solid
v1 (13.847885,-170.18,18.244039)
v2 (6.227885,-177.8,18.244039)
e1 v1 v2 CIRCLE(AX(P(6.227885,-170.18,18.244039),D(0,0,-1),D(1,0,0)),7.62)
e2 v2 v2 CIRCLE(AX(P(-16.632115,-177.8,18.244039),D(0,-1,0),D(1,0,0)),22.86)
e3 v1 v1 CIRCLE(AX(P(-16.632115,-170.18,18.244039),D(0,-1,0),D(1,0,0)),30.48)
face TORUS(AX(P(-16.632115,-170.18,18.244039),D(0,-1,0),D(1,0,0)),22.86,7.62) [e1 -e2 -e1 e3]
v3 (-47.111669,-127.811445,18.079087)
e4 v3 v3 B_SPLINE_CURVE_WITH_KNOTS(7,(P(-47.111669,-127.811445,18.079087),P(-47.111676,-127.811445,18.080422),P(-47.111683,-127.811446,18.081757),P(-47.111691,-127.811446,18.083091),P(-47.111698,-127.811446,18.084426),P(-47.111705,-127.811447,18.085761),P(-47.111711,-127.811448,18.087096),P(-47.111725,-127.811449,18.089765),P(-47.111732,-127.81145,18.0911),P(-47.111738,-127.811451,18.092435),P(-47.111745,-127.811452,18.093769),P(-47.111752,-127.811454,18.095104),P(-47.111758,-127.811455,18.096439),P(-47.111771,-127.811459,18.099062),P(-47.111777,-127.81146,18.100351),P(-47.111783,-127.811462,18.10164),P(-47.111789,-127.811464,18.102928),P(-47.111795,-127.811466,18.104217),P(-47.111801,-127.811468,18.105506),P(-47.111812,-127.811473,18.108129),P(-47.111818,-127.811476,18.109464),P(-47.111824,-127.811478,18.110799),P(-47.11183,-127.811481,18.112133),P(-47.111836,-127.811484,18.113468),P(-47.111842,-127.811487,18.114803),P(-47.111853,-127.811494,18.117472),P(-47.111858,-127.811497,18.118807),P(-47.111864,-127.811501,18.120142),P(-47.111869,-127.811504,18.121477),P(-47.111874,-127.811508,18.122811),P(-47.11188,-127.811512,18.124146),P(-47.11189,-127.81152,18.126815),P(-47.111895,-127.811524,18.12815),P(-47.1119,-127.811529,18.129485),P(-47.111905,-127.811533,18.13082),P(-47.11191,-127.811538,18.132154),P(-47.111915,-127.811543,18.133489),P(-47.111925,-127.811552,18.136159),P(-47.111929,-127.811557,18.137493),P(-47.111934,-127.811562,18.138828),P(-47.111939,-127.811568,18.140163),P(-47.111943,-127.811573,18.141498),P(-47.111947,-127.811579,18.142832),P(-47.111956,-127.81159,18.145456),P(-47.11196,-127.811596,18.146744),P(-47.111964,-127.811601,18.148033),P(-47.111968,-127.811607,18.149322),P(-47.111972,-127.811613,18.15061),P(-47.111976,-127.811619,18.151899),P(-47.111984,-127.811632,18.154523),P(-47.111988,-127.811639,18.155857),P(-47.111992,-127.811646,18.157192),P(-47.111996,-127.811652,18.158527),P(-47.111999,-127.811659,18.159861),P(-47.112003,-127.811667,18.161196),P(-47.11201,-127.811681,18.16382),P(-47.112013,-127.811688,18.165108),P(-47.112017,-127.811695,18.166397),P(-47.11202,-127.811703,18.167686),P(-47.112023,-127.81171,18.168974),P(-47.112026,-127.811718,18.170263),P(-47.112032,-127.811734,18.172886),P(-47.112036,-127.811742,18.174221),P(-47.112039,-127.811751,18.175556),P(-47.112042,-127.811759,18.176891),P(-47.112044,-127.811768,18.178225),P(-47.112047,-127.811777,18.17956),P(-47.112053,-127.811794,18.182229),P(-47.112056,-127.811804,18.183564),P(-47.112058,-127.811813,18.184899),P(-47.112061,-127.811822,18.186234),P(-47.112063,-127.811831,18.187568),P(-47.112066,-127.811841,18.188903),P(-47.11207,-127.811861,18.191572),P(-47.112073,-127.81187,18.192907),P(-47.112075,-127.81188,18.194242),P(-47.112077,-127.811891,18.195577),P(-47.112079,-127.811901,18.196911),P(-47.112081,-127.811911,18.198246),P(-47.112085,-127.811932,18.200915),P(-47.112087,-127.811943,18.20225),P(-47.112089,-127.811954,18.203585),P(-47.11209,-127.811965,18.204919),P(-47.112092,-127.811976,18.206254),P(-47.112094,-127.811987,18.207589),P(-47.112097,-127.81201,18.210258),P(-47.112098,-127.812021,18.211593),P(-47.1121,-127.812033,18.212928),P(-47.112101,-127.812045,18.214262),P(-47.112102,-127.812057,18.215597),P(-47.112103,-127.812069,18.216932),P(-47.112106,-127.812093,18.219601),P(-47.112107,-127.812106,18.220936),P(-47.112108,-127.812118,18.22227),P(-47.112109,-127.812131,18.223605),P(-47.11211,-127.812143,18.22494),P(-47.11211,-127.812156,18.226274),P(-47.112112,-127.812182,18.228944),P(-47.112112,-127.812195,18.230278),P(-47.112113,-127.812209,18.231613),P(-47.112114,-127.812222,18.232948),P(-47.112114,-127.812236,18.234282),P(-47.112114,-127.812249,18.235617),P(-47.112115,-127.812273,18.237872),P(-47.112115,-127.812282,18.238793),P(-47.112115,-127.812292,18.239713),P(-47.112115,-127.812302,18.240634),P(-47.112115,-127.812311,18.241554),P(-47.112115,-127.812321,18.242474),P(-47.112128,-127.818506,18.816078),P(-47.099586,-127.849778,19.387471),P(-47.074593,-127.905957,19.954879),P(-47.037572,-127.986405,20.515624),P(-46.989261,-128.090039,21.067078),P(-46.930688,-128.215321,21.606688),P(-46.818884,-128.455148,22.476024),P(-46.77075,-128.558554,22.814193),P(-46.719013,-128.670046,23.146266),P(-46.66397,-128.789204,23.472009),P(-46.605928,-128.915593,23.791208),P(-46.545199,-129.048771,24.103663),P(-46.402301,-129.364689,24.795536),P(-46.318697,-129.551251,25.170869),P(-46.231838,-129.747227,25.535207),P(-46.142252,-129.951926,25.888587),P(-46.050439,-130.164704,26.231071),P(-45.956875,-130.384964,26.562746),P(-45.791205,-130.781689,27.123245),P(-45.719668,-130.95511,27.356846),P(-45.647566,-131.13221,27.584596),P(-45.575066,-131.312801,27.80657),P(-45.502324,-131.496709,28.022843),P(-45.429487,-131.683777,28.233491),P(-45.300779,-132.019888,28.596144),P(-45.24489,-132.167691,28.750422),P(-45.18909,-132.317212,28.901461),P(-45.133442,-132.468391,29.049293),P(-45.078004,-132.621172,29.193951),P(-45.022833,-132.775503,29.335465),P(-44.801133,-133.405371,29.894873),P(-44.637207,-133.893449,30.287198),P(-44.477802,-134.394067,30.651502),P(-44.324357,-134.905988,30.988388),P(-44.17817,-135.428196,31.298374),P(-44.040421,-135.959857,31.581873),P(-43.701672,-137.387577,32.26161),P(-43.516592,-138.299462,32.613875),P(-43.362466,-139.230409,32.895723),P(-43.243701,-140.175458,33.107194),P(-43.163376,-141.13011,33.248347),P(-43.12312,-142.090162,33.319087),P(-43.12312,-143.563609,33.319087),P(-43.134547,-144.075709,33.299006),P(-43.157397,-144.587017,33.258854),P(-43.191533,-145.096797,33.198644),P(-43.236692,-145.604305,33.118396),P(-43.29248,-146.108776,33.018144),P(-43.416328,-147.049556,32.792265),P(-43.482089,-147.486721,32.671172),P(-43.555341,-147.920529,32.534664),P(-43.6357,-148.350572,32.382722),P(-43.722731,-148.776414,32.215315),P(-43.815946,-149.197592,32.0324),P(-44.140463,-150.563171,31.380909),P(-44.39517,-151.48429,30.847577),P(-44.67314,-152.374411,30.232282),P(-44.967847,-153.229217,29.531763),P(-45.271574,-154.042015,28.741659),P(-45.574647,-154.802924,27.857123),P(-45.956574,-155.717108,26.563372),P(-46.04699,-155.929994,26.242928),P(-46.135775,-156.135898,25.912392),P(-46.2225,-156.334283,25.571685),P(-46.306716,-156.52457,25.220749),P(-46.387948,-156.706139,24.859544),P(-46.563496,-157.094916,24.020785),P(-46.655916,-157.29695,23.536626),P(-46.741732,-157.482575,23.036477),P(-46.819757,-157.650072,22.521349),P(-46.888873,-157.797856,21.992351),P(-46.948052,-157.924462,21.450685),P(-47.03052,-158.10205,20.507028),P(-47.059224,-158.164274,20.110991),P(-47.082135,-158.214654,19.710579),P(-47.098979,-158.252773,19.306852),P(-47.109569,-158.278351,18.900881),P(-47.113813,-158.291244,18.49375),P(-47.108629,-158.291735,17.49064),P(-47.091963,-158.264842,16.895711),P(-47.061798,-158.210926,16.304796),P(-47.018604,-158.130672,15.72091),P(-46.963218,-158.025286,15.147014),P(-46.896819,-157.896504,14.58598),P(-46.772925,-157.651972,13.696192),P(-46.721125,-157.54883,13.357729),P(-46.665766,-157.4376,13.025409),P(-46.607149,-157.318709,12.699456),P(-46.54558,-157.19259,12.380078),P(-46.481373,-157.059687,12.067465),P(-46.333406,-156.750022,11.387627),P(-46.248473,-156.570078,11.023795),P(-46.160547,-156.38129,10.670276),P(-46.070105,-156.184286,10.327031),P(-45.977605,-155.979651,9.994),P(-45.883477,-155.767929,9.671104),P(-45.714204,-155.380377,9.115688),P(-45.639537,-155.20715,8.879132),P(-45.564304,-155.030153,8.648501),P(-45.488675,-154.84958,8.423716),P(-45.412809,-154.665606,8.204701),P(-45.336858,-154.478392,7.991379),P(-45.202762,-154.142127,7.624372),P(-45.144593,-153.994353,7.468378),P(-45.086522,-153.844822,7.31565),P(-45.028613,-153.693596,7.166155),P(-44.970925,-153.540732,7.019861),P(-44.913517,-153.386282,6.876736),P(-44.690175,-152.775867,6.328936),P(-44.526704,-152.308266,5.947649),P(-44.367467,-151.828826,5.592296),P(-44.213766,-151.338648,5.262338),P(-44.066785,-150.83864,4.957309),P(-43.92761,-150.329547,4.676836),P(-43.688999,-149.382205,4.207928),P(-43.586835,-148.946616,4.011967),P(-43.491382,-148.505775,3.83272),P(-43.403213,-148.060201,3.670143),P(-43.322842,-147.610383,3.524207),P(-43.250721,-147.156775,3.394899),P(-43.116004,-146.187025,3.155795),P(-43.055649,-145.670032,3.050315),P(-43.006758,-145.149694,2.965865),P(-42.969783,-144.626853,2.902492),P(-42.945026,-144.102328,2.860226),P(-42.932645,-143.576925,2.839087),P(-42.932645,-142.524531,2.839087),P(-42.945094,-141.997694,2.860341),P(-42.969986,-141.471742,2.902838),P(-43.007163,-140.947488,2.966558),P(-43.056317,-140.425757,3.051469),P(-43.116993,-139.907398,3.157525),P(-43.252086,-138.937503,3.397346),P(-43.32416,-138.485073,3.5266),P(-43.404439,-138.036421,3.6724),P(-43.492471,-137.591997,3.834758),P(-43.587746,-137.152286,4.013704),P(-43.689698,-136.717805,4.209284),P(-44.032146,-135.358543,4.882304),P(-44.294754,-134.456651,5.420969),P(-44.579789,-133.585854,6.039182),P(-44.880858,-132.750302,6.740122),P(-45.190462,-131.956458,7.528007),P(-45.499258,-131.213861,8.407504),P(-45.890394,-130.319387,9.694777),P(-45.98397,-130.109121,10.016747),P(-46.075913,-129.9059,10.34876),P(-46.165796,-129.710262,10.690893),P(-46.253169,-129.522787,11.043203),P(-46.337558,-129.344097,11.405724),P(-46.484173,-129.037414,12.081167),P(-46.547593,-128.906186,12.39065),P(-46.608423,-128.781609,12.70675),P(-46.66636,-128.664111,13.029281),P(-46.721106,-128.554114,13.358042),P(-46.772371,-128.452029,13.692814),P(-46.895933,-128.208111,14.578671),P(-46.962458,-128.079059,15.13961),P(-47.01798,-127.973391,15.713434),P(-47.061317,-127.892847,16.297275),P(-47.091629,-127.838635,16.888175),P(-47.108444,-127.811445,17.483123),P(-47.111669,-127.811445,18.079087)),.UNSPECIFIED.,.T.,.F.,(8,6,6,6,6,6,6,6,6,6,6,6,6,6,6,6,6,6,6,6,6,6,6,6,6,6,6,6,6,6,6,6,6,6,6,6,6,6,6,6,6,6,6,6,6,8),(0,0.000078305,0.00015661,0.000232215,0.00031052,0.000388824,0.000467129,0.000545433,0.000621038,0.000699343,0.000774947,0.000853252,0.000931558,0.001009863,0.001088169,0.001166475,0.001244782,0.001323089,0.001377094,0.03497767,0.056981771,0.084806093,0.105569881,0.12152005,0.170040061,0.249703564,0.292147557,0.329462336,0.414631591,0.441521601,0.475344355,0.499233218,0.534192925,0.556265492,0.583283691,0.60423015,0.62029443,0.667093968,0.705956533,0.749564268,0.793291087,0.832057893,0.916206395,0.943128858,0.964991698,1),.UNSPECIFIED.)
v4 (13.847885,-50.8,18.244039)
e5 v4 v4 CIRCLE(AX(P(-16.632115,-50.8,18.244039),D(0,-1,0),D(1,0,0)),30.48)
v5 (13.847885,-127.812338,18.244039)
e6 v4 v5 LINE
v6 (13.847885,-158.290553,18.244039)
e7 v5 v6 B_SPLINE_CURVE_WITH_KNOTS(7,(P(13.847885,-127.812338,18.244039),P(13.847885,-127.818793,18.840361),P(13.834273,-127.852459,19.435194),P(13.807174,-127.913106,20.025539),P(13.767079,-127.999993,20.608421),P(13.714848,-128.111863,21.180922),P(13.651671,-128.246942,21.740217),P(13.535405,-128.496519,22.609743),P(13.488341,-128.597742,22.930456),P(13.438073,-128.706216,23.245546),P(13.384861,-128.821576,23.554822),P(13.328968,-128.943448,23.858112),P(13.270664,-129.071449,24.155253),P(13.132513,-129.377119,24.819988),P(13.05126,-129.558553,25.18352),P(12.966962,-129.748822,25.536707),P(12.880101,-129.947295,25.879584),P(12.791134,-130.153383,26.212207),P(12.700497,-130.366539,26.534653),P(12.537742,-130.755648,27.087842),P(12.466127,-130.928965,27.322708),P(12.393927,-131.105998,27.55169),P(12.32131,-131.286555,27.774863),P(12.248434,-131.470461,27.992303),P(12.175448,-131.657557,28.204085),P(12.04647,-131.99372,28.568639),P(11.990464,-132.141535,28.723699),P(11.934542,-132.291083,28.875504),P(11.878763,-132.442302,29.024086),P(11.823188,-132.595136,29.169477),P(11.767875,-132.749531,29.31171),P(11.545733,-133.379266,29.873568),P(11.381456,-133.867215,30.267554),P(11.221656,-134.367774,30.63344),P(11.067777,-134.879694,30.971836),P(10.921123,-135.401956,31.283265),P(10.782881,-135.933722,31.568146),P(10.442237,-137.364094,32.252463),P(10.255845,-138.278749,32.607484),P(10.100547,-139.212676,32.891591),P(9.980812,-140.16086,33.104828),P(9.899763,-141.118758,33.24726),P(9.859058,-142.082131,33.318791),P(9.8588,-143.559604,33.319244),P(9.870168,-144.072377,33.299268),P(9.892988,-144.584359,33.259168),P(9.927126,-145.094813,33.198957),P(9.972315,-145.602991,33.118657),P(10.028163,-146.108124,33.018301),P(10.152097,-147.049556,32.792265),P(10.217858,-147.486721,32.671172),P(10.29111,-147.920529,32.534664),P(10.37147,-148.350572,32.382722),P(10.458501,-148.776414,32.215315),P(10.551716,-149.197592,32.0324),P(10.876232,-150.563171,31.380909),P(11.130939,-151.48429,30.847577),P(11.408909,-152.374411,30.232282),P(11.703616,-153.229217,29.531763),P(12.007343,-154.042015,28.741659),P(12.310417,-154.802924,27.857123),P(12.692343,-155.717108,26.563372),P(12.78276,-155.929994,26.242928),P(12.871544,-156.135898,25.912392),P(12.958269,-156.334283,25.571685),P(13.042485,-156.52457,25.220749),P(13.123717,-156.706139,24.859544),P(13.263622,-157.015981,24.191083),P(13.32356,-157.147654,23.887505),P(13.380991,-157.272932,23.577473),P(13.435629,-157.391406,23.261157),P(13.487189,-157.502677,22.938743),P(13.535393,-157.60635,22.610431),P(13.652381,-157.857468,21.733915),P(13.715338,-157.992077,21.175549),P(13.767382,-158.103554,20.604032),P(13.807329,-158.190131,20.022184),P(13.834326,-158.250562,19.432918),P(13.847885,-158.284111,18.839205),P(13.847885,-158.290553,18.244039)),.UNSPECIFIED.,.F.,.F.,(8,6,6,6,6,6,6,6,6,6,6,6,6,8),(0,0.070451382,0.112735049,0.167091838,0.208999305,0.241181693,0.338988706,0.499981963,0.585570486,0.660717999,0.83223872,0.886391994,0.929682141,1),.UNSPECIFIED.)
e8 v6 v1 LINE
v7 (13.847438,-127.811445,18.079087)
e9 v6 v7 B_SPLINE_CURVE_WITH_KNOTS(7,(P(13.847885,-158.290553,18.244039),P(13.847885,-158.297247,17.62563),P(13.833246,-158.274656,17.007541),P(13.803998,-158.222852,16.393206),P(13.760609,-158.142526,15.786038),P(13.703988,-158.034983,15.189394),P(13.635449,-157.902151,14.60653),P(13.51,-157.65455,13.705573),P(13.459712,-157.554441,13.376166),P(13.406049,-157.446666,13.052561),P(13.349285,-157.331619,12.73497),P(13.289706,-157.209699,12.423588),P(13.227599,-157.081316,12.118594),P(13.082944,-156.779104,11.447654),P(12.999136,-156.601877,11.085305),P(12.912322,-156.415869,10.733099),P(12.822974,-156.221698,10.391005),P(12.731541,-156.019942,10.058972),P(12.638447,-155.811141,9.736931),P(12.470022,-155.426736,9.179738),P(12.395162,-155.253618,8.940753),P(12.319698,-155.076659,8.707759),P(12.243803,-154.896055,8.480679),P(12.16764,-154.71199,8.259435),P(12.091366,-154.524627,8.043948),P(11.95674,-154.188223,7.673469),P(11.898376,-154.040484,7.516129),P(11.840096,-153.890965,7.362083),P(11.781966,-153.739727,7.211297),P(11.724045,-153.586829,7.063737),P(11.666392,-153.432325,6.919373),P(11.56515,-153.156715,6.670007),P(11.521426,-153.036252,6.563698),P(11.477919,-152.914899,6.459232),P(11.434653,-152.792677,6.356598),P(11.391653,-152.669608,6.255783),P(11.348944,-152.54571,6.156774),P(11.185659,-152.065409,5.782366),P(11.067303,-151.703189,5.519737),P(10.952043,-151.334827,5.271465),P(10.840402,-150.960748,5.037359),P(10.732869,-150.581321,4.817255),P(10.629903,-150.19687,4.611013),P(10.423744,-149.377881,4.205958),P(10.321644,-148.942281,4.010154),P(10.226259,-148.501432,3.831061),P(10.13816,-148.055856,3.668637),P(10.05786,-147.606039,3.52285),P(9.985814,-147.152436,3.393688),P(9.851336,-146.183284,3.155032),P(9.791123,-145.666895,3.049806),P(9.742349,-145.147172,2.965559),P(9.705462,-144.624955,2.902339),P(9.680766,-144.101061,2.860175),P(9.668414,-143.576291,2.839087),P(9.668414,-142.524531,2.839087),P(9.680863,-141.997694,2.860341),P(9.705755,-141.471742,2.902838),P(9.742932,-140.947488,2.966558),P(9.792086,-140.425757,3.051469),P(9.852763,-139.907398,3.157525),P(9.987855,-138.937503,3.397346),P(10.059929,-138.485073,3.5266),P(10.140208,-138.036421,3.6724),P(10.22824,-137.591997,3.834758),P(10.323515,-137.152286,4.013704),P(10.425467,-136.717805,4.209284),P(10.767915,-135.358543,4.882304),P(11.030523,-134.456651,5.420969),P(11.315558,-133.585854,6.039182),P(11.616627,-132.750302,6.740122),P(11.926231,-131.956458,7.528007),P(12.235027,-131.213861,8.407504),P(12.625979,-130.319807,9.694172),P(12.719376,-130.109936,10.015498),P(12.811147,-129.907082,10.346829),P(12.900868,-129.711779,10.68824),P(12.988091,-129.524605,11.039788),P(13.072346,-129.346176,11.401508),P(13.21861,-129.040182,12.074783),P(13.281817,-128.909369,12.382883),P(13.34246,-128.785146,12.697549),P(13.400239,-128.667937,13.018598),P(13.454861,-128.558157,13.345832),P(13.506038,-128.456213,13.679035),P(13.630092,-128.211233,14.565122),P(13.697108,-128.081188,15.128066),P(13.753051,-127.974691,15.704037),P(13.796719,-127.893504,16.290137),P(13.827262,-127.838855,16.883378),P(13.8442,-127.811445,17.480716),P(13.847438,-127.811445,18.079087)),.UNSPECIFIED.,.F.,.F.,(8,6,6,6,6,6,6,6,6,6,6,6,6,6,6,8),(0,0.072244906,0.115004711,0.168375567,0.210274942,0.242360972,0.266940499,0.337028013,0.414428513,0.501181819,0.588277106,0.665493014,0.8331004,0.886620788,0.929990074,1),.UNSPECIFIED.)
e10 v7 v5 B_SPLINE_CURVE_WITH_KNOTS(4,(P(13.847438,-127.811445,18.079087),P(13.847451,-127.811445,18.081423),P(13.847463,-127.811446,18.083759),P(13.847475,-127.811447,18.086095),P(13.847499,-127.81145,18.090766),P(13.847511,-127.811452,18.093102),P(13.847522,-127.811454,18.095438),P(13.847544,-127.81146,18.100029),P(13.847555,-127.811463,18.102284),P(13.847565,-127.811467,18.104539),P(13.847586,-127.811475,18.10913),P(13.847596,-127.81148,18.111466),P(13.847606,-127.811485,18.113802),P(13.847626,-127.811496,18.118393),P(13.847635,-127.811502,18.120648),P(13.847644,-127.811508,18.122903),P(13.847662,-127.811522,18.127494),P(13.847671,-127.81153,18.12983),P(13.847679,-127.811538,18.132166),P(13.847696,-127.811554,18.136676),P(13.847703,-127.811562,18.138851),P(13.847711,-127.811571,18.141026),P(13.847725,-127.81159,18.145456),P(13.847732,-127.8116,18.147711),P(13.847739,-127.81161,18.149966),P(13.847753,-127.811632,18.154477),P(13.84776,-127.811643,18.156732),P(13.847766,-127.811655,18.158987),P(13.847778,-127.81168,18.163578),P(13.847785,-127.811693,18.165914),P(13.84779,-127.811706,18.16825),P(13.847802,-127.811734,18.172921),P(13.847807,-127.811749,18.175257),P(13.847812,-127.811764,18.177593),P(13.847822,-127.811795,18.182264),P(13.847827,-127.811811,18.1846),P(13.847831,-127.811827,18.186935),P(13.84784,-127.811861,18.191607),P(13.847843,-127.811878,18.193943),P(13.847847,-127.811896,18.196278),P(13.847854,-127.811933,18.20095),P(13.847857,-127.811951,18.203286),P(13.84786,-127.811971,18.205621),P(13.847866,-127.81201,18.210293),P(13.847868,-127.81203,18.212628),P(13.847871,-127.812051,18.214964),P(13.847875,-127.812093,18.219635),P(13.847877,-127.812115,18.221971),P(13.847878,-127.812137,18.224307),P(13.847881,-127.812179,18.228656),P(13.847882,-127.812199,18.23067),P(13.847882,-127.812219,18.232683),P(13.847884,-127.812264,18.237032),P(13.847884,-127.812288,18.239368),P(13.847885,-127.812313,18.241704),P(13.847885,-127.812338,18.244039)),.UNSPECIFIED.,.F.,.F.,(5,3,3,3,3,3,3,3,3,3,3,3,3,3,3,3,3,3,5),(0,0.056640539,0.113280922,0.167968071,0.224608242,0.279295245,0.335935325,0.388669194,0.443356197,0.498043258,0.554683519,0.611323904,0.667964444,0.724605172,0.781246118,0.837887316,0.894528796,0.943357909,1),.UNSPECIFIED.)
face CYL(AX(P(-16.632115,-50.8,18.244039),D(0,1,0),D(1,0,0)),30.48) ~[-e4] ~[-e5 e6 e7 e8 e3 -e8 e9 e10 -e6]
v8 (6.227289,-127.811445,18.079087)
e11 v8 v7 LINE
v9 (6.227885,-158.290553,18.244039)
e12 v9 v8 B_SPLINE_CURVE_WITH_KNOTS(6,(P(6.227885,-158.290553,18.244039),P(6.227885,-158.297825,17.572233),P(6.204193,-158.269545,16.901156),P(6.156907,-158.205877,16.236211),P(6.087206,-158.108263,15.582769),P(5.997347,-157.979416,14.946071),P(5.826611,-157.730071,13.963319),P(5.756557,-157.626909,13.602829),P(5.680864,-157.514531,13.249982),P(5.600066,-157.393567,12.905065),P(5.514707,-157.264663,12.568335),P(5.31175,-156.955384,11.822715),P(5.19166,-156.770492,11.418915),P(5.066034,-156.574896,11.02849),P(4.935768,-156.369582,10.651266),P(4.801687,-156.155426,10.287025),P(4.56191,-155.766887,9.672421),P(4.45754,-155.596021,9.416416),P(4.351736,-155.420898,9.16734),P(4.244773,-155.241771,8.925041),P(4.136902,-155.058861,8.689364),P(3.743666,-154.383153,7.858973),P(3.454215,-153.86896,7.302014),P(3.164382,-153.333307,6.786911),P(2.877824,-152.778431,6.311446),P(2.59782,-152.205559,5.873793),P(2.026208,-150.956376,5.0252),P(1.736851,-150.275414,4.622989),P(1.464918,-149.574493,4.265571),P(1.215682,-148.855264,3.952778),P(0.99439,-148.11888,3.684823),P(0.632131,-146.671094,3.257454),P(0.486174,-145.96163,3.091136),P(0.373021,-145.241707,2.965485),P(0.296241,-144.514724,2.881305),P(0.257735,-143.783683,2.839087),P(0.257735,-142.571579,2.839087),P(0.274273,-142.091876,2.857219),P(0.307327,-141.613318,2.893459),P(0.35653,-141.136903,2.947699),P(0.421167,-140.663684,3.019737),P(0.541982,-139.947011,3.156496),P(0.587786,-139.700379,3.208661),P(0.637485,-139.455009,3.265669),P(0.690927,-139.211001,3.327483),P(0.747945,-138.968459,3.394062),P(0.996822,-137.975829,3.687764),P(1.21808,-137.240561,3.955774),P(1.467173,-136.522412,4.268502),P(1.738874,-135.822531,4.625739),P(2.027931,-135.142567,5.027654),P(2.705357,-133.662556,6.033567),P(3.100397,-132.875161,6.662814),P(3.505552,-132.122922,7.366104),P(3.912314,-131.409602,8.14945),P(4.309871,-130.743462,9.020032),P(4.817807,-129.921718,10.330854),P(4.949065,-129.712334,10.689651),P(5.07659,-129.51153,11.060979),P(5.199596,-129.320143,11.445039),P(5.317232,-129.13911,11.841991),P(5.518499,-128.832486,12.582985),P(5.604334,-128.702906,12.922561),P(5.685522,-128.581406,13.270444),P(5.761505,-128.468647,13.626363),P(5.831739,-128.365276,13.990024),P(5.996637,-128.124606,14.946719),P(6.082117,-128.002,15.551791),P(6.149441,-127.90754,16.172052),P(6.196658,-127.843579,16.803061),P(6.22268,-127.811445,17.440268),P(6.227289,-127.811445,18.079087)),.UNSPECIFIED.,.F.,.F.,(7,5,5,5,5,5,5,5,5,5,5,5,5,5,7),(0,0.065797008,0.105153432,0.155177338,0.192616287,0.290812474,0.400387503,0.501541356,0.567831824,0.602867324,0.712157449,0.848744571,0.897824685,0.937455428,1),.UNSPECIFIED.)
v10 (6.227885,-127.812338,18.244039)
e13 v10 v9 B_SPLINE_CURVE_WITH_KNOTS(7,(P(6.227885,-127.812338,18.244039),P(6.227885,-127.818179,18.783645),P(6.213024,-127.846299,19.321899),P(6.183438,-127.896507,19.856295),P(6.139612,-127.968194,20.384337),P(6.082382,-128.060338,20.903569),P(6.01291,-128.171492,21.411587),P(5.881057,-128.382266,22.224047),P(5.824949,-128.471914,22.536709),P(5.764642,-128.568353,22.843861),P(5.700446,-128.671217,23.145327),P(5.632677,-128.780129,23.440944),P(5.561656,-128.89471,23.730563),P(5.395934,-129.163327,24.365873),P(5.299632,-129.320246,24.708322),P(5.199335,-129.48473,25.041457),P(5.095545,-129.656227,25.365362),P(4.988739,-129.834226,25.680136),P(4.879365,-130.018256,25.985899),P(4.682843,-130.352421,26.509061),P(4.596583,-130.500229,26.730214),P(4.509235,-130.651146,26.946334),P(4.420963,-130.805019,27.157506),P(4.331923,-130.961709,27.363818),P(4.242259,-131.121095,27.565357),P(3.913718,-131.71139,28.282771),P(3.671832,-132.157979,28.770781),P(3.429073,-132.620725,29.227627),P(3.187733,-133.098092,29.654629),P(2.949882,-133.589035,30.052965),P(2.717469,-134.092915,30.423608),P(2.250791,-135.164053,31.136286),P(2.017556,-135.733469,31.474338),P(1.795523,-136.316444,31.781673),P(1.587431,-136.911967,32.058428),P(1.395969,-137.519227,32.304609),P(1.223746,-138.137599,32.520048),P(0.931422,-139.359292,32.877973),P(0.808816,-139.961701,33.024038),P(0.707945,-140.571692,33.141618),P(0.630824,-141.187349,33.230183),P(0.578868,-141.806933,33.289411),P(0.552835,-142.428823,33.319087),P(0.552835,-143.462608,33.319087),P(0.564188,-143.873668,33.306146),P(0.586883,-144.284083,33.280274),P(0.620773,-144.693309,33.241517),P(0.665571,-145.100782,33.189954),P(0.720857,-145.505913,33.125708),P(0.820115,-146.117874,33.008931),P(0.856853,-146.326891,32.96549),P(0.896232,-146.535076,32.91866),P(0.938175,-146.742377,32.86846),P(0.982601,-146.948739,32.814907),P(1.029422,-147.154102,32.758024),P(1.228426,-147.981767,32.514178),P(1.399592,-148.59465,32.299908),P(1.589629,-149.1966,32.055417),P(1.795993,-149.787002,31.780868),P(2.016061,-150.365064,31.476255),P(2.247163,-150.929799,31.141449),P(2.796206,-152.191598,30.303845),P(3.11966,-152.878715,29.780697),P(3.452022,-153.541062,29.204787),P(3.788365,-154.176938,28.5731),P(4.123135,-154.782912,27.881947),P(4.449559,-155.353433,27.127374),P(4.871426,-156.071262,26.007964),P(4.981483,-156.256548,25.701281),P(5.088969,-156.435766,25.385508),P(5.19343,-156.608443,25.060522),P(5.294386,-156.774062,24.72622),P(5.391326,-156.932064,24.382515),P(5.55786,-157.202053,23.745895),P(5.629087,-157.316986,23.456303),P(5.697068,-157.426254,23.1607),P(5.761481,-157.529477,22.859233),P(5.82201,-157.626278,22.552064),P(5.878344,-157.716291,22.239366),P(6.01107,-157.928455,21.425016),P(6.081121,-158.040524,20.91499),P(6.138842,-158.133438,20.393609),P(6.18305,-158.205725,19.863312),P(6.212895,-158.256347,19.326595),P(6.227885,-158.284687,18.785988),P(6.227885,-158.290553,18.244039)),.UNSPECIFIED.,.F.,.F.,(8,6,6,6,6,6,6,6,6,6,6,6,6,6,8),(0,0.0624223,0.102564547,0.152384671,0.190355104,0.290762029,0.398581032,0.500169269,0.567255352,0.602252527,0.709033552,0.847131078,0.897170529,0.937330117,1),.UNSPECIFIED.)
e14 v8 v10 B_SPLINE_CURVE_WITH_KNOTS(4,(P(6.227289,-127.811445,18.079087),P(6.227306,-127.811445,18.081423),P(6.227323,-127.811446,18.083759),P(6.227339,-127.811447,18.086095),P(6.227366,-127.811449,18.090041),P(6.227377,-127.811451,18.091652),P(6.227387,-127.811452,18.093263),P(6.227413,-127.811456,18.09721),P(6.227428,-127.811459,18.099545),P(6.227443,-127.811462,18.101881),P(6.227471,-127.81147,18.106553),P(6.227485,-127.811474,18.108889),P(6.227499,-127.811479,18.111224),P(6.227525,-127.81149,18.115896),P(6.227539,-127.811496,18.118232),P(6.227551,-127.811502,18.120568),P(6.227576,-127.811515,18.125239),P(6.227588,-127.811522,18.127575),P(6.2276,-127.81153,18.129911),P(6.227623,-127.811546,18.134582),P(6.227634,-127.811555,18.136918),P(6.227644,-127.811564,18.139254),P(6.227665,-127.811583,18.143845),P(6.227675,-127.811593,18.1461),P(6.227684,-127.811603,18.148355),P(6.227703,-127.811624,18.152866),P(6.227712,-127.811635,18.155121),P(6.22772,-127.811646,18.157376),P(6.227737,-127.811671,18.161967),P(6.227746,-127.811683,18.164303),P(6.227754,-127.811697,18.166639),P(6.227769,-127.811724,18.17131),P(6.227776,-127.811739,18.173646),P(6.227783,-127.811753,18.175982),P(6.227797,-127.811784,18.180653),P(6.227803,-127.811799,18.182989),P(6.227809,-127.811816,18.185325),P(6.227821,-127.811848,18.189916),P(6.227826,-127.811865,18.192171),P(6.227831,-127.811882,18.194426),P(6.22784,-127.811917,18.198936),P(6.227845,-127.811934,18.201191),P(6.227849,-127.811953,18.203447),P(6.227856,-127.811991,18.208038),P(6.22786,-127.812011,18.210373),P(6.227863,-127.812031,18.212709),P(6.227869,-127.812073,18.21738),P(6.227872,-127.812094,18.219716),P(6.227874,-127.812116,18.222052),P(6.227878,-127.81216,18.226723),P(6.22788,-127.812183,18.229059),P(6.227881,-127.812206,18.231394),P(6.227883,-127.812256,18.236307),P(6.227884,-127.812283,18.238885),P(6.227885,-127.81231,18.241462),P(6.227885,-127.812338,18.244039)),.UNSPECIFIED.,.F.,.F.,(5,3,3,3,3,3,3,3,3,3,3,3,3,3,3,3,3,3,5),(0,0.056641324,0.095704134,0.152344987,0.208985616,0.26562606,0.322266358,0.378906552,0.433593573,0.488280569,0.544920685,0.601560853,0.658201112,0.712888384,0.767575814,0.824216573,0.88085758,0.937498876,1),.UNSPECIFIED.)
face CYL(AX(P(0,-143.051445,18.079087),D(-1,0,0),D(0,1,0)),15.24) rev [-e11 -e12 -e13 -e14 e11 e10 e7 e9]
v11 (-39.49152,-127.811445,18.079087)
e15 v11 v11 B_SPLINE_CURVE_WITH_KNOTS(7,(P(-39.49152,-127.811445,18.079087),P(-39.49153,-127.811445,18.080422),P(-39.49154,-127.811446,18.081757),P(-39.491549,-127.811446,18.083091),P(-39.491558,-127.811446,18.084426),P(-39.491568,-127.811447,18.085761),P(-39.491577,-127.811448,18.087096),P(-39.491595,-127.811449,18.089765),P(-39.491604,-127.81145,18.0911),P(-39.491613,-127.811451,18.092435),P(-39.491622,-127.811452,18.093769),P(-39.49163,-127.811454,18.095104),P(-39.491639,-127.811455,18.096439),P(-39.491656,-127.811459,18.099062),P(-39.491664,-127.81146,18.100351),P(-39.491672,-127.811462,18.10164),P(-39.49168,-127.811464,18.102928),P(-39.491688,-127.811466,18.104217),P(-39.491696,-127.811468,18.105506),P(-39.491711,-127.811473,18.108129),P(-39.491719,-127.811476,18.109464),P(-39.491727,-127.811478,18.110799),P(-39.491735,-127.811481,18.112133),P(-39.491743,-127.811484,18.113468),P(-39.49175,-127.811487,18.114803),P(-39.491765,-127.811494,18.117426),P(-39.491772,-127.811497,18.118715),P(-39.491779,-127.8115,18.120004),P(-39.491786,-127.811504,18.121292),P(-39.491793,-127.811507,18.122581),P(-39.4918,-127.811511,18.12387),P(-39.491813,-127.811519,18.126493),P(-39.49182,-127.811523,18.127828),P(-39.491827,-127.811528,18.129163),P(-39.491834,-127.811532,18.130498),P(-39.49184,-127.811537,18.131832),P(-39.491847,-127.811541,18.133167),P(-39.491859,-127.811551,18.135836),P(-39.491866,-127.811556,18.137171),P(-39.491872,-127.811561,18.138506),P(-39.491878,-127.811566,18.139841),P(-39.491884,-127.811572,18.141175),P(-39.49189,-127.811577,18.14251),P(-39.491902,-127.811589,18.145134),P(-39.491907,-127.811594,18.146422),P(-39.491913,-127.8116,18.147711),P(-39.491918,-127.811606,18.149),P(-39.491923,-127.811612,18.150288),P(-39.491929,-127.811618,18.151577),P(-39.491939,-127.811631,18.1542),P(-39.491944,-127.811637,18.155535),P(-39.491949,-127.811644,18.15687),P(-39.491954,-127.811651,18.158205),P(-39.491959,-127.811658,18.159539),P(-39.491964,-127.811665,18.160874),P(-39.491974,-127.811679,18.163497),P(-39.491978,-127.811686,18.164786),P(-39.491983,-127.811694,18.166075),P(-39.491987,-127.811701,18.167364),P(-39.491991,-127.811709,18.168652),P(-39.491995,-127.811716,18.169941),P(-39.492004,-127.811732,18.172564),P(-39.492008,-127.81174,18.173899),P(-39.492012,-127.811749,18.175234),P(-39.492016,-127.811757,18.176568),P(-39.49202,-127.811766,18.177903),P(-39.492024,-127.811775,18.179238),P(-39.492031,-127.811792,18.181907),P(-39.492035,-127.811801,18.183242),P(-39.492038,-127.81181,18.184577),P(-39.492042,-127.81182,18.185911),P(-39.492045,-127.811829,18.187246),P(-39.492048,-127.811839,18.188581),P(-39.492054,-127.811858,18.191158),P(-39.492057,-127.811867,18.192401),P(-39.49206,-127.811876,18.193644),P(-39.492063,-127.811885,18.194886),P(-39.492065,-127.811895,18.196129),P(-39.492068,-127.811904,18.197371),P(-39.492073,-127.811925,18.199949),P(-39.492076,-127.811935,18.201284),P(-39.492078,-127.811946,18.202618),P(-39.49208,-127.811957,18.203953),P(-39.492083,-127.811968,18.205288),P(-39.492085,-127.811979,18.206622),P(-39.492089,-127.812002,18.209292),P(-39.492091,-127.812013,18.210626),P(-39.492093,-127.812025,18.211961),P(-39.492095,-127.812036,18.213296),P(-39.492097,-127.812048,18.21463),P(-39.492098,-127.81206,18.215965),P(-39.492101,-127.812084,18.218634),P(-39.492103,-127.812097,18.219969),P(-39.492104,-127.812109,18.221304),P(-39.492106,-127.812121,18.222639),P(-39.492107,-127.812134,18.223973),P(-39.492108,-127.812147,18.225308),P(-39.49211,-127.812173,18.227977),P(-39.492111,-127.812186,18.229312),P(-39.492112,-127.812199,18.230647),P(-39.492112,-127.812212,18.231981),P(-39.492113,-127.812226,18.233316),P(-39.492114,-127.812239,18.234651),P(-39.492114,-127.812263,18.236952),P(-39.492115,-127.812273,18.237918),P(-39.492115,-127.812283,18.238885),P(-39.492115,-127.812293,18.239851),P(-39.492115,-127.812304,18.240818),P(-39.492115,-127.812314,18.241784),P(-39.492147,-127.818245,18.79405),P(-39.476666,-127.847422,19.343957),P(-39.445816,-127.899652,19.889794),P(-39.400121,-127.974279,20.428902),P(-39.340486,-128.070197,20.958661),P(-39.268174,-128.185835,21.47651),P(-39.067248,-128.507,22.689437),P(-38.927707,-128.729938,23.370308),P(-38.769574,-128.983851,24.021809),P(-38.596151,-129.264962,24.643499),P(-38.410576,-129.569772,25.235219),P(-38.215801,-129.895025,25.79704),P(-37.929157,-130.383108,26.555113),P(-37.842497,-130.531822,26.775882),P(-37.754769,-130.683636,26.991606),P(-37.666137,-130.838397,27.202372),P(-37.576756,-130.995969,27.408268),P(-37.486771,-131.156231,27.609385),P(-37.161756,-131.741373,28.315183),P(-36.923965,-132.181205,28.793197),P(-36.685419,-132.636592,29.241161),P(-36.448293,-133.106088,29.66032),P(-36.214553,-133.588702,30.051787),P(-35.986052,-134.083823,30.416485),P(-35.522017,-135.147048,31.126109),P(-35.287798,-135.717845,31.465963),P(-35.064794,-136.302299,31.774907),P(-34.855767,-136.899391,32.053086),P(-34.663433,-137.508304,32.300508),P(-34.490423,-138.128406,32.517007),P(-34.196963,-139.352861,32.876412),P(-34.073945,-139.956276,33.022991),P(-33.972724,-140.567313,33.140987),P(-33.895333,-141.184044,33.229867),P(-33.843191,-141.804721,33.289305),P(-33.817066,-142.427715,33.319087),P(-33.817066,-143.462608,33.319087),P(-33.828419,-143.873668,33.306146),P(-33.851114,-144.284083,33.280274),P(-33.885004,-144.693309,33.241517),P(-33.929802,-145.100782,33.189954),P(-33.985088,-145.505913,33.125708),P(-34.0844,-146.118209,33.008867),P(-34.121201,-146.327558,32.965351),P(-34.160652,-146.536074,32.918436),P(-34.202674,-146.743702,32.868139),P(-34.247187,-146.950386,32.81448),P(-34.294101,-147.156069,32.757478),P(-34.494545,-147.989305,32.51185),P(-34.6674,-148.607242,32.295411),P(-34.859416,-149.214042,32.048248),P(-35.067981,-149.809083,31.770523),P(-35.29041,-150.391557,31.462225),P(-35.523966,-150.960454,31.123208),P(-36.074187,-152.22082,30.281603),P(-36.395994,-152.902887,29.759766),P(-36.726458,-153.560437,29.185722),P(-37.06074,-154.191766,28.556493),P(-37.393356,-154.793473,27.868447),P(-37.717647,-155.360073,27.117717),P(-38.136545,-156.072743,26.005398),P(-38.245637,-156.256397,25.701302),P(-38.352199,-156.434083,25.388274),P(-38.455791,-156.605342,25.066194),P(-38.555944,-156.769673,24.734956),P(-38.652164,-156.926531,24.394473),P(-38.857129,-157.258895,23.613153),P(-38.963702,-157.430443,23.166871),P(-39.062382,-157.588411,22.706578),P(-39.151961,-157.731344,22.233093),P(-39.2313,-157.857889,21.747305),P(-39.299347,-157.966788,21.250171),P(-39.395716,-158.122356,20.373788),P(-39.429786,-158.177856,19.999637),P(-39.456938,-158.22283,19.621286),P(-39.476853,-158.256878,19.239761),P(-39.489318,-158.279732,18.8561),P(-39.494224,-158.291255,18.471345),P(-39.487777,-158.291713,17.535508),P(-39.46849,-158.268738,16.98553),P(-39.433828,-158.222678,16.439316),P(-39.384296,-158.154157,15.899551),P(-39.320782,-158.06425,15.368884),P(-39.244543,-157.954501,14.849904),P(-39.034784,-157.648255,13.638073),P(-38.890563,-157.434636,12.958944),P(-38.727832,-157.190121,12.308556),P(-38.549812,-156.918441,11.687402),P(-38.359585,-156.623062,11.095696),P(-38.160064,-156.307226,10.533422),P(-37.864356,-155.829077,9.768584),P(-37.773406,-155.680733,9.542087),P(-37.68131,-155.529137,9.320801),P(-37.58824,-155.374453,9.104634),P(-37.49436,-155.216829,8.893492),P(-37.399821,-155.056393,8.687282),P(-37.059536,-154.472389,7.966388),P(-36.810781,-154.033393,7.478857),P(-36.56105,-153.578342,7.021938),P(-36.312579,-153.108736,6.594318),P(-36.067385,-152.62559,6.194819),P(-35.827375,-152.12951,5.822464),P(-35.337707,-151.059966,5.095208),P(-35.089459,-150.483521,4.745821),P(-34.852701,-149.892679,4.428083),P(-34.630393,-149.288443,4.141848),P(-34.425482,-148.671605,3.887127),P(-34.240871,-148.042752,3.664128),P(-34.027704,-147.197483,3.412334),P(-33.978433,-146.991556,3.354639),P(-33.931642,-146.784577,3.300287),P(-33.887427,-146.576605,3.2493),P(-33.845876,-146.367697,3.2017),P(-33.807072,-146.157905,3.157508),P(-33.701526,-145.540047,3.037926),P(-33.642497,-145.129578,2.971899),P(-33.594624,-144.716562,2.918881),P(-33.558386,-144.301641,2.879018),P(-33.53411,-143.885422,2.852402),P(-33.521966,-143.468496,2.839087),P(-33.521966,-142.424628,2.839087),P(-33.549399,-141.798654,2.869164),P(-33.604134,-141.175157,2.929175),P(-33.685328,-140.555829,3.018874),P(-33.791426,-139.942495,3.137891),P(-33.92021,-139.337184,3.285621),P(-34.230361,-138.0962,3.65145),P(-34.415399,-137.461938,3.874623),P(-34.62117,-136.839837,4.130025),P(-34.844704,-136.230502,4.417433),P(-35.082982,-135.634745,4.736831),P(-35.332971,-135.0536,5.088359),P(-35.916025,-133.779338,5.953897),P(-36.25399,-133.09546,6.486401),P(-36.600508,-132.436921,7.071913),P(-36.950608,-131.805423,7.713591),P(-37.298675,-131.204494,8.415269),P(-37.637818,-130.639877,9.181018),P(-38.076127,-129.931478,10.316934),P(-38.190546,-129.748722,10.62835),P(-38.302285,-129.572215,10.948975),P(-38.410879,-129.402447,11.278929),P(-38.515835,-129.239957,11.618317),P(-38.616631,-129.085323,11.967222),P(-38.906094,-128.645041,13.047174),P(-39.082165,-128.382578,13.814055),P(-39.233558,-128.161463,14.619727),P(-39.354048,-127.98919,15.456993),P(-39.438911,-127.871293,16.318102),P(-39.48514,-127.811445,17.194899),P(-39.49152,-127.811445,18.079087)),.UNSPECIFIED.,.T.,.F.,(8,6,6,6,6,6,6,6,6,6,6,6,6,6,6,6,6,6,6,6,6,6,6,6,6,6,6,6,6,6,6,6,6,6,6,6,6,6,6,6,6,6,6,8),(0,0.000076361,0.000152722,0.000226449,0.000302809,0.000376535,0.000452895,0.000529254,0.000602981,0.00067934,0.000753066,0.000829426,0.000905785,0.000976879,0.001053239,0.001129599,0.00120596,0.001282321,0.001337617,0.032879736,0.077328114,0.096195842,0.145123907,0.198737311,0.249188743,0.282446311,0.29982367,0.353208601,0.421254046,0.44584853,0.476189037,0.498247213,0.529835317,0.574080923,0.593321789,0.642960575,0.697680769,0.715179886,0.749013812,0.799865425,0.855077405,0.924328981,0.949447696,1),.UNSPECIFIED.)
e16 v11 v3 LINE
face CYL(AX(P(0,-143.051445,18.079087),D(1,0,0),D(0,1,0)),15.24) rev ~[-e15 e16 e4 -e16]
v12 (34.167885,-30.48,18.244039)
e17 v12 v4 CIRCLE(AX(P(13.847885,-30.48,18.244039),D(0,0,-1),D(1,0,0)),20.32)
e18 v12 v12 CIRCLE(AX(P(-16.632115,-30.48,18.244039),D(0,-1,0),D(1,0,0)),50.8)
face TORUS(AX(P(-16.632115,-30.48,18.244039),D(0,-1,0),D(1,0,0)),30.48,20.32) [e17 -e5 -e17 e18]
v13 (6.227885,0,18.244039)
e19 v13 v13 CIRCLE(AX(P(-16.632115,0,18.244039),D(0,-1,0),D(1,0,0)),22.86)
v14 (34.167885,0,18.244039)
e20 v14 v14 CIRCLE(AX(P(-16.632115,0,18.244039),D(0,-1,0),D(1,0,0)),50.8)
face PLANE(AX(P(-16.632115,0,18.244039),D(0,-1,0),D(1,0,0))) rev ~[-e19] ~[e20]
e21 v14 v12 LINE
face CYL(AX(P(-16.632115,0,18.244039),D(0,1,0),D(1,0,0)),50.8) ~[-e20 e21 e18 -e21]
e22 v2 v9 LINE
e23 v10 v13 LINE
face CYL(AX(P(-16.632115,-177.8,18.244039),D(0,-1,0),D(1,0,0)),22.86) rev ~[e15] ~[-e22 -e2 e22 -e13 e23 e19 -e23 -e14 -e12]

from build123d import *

# Parameters (mm, degrees)
F0_R          = 50.8
F1_DEPTH      = 50.8
F2_R          = 20.32
F3_DEPTH      = 127
F4_R          = 7.62
F5_DEPTH      = 231.902
F6_R          = 15.24
F7_DEPTH      = 114.3
F7_DEPTH_BACK = 213.36


with BuildPart() as f1:
    # F0 (on Front) → F1 (new body)
    with BuildSketch(Plane.XZ):
        with Locations((-16.6321154684, 18.2440392673)):
            Circle(F0_R)
    extrude(amount=F1_DEPTH)

    # F2
    f2_edges = [f1.edges().sort_by_distance(p)[0] for p in [
        (-67.432115, -50.8, 18.244039),
    ]]
    fillet(f2_edges, radius=F2_R)

    # F3 (add): a face of the model
    f3_faces = [f1.faces().sort_by_distance(p)[0] for p in [
        (-16.6321154684, -50.8, 18.2440392673),
    ]]
    extrude(f3_faces, amount=F3_DEPTH)

    # F4
    f4_edges = [f1.edges().sort_by_distance(p)[0] for p in [
        (-47.112115, -177.8, 18.244039),
    ]]
    fillet(f4_edges, radius=F4_R)

    # F5 (cut): a face of the model
    f5_faces = [f1.faces().sort_by_distance(p)[0] for p in [
        (-16.6321154684, -177.8, 18.2440392673),
    ]]
    extrude(f5_faces, amount=-F5_DEPTH, mode=Mode.SUBTRACT)

    # F6 (on Right) → F7 (cut, two sides)
    with BuildSketch(Plane.YZ) as f7_sk:
        with Locations((-143.0514454842, 18.0790871382)):
            Circle(F6_R)
    extrude(amount=F7_DEPTH, mode=Mode.SUBTRACT)
    extrude(f7_sk.sketch, amount=-F7_DEPTH_BACK, mode=Mode.SUBTRACT)


solid = f1.part
